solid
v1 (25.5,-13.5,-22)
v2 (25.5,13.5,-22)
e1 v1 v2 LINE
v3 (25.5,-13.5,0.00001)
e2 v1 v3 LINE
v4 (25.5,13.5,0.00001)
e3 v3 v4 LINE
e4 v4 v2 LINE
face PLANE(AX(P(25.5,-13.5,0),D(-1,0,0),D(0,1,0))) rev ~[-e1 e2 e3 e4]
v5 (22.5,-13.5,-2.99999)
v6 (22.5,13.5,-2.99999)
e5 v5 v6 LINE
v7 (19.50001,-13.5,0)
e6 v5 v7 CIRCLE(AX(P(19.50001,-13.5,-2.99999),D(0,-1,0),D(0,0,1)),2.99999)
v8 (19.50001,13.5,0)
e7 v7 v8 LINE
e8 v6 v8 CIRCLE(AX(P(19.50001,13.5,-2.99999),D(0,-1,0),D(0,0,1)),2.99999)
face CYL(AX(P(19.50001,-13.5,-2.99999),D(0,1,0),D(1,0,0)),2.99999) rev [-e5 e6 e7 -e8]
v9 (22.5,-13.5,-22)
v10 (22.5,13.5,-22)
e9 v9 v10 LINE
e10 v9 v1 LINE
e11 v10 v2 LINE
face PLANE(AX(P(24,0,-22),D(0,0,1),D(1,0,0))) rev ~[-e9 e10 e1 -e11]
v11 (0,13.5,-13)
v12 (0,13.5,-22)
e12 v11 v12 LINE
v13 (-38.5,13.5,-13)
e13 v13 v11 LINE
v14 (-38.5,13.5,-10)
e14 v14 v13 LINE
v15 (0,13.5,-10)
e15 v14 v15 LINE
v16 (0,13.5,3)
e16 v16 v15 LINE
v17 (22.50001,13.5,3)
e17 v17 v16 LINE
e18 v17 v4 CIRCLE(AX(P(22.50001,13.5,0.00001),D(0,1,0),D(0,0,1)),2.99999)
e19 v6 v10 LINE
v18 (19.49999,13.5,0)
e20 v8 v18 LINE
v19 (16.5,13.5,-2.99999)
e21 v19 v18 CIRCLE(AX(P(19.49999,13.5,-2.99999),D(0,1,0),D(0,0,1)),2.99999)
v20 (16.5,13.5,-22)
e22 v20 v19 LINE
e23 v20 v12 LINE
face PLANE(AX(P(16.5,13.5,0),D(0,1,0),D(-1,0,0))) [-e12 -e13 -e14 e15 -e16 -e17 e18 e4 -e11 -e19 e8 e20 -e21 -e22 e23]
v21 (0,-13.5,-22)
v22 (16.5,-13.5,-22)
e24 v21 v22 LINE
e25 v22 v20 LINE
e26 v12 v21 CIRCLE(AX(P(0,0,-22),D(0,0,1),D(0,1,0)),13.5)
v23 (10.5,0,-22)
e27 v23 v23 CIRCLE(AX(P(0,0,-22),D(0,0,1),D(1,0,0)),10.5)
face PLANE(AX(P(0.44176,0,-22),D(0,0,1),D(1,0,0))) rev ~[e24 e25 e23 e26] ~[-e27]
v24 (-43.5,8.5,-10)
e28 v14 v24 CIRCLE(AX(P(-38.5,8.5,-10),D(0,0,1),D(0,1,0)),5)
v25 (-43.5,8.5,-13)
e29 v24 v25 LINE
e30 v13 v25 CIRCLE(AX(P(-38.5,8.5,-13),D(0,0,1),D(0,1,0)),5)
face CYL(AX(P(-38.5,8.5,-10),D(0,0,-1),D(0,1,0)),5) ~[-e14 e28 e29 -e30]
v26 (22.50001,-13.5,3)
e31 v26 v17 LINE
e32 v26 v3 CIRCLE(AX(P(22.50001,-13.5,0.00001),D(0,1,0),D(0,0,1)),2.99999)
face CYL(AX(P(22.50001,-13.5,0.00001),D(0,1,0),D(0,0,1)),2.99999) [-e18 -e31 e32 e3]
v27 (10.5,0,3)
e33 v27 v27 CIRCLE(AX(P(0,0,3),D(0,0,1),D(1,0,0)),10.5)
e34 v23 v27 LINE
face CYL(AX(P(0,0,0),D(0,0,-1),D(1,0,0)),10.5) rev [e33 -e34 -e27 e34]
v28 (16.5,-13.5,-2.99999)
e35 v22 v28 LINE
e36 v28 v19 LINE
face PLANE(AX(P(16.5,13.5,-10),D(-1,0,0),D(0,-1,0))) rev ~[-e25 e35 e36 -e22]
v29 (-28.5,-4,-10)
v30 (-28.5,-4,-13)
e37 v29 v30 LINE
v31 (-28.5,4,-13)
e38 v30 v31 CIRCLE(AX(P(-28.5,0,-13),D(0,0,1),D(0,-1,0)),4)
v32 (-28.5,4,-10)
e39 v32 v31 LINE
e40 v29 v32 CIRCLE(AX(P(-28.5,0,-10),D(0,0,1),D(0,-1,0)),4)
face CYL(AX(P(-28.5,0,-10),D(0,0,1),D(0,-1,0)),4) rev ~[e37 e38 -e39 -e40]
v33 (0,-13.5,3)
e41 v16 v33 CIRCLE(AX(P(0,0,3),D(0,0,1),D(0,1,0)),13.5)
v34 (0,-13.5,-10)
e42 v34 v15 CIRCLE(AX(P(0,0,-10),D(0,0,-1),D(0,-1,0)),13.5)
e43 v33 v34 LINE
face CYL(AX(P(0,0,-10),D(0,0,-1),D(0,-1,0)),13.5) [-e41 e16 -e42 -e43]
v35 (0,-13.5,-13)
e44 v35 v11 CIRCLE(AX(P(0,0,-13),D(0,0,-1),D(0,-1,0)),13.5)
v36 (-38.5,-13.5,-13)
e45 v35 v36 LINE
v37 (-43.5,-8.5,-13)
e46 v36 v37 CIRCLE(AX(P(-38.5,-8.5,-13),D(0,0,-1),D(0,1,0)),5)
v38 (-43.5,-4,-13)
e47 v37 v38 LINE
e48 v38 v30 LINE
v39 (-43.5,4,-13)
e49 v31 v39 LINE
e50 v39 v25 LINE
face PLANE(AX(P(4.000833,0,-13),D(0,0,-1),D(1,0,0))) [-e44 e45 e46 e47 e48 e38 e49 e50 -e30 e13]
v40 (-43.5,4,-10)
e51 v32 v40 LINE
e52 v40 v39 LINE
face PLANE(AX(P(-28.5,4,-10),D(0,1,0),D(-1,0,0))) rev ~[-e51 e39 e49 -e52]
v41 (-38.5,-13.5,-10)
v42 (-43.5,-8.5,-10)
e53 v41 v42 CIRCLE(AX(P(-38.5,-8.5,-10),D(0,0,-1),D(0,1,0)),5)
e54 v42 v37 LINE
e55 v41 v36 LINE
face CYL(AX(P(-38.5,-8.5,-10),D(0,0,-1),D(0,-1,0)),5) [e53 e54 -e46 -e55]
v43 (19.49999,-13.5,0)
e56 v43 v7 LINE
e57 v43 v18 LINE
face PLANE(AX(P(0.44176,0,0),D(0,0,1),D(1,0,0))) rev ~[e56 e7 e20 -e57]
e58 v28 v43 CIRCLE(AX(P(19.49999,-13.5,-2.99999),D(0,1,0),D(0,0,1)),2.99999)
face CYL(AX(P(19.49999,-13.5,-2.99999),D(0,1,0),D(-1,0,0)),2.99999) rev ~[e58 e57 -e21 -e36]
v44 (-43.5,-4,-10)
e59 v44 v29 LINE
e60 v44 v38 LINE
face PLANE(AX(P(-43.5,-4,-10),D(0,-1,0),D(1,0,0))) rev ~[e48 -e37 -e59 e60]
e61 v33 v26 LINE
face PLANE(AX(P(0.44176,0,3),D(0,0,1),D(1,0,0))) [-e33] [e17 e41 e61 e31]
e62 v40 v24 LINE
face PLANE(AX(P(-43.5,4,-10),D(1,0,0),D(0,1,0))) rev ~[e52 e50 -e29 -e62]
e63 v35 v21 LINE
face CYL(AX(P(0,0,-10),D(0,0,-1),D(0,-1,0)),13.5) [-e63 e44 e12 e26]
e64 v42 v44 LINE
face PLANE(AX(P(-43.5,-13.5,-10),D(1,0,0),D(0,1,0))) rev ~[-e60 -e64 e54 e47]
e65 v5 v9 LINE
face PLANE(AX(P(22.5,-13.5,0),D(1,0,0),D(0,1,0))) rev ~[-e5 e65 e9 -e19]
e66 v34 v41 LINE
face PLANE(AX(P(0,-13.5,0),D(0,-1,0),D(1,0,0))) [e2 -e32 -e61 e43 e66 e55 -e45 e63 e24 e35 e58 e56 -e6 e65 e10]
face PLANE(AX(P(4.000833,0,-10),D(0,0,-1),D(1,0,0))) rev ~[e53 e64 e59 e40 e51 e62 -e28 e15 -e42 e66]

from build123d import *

# Parameters (mm, degrees)
F0_R     = 10.5
F0_W     = 6
F0_H     = 27
F0_W_2   = 3
F1_DEPTH = 3
F2_DEPTH = 22
F3_R     = 2.99999
F5_R     = 10.5
F6_DEPTH = 12
F7_DEPTH = 3
F8_R     = 5


# Not quite as in the source:
# - a fillet or chamfer is up to 0.001 mm smaller than in the source, because OpenCascade refuses the exact size


with BuildPart() as f1:
    # F0 (on Top) → F1 (new body)
    with BuildSketch(Plane.XY):
        with BuildLine():
            ThreePointArc((0, -13.5), (9.545941546, -9.545941546), (13.5, 0))
            ThreePointArc((13.5, 0), (9.545941546, 9.545941546), (0, 13.5))
            ThreePointArc((0, 13.5), (-13.5, 0), (0, -13.5))
        make_face()
        Circle(F0_R, mode=Mode.SUBTRACT)
        with BuildLine():
            Line((13.5, -13.5), (13.5, 0))
            ThreePointArc((13.5, 0), (9.545941546, -9.545941546), (0, -13.5))
            Line((0, -13.5), (13.5, -13.5))
        make_face()
        with BuildLine():
            ThreePointArc((0, 13.5), (9.545941546, 9.545941546), (13.5, 0))
            Line((13.5, 0), (13.5, 13.5))
            Line((13.5, 13.5), (0, 13.5))
        make_face()
        Polygon((13.5, 13.5), (13.5, 0), (13.5, -13.5), (16.5, -13.5), (16.5, 13.5), align=None)
        with Locations((19.5, 0)):
            Rectangle(F0_W, F0_H)
        with Locations((24, 0)):
            Rectangle(F0_W_2, F0_H)
    extrude(amount=F1_DEPTH)

    # F0 (on Top) → F2 (join)
    with BuildSketch(Plane.XY):
        with BuildLine():
            ThreePointArc((0, -13.5), (9.545941546, -9.545941546), (13.5, 0))
            ThreePointArc((13.5, 0), (9.545941546, 9.545941546), (0, 13.5))
            ThreePointArc((0, 13.5), (-13.5, 0), (0, -13.5))
        make_face()
        Circle(F0_R, mode=Mode.SUBTRACT)
        with BuildLine():
            ThreePointArc((0, 13.5), (9.545941546, 9.545941546), (13.5, 0))
            Line((13.5, 0), (13.5, 13.5))
            Line((13.5, 13.5), (0, 13.5))
        make_face()
        Polygon((13.5, 13.5), (13.5, 0), (13.5, -13.5), (16.5, -13.5), (16.5, 13.5), align=None)
        with Locations((24, 0)):
            Rectangle(F0_W_2, F0_H)
        with BuildLine():
            Line((13.5, -13.5), (13.5, 0))
            ThreePointArc((13.5, 0), (9.545941546, -9.545941546), (0, -13.5))
            Line((0, -13.5), (13.5, -13.5))
        make_face()
    extrude(amount=-F2_DEPTH)

    # F3 (radius 3 in the source; OpenCascade refuses exactly that, so slightly less here)
    f3_edges = [f1.edges().sort_by_distance(p)[0] for p in [
        (16.5, 0, 0),
        (22.5, 0, 0),
        (25.5, 0, 3),
    ]]
    fillet(f3_edges, radius=F3_R)



with BuildPart() as f6:
    # F5 (on offset) → F6 (new body)
    with BuildSketch(Plane(origin=(0, 0, -10), x_dir=(1, 0, 0), z_dir=(0, 0, -1))):
        with BuildLine():
            Line((16.5, 13.5), (0, 13.5))
            ThreePointArc((0, 13.5), (-13.5, 0), (0, -13.5))
            Line((0, -13.5), (16.5, -13.5))
            Line((16.5, -13.5), (16.5, 13.5))
        make_face()
        Circle(F5_R, mode=Mode.SUBTRACT)
    extrude(amount=-F6_DEPTH)


with BuildPart() as f1_1:
    add(f1.part)

    add(f6.part)  # F7 merges F6
    # F5 (on offset) → F7 (join)
    with BuildSketch(Plane(origin=(0, 0, -10), x_dir=(1, 0, 0), z_dir=(0, 0, -1))):
        with BuildLine():
            Line((16.5, 13.5), (0, 13.5))
            ThreePointArc((0, 13.5), (-13.5, 0), (0, -13.5))
            Line((0, -13.5), (16.5, -13.5))
            Line((16.5, -13.5), (16.5, 13.5))
        make_face()
        Circle(F5_R, mode=Mode.SUBTRACT)
        with BuildLine():
            ThreePointArc((0, -13.5), (-13.5, 0), (0, 13.5))
            Line((0, 13.5), (-43.5, 13.5))
            Line((-43.5, 13.5), (-43.5, 4))
            Line((-43.5, 4), (-28.5, 4))
            ThreePointArc((-28.5, 4), (-24.5, 0), (-28.5, -4))
            Line((-28.5, -4), (-43.5, -4))
            Line((-43.5, -4), (-43.5, -13.5))
            Line((-43.5, -13.5), (0, -13.5))
        make_face()
    extrude(amount=F7_DEPTH)

    # F8
    f8_edges = [f1_1.edges().sort_by_distance(p)[0] for p in [
        (-43.5, -13.5, -11.5),
        (-43.5, 13.5, -11.5),
    ]]
    fillet(f8_edges, radius=F8_R)


solid = f1_1.part
